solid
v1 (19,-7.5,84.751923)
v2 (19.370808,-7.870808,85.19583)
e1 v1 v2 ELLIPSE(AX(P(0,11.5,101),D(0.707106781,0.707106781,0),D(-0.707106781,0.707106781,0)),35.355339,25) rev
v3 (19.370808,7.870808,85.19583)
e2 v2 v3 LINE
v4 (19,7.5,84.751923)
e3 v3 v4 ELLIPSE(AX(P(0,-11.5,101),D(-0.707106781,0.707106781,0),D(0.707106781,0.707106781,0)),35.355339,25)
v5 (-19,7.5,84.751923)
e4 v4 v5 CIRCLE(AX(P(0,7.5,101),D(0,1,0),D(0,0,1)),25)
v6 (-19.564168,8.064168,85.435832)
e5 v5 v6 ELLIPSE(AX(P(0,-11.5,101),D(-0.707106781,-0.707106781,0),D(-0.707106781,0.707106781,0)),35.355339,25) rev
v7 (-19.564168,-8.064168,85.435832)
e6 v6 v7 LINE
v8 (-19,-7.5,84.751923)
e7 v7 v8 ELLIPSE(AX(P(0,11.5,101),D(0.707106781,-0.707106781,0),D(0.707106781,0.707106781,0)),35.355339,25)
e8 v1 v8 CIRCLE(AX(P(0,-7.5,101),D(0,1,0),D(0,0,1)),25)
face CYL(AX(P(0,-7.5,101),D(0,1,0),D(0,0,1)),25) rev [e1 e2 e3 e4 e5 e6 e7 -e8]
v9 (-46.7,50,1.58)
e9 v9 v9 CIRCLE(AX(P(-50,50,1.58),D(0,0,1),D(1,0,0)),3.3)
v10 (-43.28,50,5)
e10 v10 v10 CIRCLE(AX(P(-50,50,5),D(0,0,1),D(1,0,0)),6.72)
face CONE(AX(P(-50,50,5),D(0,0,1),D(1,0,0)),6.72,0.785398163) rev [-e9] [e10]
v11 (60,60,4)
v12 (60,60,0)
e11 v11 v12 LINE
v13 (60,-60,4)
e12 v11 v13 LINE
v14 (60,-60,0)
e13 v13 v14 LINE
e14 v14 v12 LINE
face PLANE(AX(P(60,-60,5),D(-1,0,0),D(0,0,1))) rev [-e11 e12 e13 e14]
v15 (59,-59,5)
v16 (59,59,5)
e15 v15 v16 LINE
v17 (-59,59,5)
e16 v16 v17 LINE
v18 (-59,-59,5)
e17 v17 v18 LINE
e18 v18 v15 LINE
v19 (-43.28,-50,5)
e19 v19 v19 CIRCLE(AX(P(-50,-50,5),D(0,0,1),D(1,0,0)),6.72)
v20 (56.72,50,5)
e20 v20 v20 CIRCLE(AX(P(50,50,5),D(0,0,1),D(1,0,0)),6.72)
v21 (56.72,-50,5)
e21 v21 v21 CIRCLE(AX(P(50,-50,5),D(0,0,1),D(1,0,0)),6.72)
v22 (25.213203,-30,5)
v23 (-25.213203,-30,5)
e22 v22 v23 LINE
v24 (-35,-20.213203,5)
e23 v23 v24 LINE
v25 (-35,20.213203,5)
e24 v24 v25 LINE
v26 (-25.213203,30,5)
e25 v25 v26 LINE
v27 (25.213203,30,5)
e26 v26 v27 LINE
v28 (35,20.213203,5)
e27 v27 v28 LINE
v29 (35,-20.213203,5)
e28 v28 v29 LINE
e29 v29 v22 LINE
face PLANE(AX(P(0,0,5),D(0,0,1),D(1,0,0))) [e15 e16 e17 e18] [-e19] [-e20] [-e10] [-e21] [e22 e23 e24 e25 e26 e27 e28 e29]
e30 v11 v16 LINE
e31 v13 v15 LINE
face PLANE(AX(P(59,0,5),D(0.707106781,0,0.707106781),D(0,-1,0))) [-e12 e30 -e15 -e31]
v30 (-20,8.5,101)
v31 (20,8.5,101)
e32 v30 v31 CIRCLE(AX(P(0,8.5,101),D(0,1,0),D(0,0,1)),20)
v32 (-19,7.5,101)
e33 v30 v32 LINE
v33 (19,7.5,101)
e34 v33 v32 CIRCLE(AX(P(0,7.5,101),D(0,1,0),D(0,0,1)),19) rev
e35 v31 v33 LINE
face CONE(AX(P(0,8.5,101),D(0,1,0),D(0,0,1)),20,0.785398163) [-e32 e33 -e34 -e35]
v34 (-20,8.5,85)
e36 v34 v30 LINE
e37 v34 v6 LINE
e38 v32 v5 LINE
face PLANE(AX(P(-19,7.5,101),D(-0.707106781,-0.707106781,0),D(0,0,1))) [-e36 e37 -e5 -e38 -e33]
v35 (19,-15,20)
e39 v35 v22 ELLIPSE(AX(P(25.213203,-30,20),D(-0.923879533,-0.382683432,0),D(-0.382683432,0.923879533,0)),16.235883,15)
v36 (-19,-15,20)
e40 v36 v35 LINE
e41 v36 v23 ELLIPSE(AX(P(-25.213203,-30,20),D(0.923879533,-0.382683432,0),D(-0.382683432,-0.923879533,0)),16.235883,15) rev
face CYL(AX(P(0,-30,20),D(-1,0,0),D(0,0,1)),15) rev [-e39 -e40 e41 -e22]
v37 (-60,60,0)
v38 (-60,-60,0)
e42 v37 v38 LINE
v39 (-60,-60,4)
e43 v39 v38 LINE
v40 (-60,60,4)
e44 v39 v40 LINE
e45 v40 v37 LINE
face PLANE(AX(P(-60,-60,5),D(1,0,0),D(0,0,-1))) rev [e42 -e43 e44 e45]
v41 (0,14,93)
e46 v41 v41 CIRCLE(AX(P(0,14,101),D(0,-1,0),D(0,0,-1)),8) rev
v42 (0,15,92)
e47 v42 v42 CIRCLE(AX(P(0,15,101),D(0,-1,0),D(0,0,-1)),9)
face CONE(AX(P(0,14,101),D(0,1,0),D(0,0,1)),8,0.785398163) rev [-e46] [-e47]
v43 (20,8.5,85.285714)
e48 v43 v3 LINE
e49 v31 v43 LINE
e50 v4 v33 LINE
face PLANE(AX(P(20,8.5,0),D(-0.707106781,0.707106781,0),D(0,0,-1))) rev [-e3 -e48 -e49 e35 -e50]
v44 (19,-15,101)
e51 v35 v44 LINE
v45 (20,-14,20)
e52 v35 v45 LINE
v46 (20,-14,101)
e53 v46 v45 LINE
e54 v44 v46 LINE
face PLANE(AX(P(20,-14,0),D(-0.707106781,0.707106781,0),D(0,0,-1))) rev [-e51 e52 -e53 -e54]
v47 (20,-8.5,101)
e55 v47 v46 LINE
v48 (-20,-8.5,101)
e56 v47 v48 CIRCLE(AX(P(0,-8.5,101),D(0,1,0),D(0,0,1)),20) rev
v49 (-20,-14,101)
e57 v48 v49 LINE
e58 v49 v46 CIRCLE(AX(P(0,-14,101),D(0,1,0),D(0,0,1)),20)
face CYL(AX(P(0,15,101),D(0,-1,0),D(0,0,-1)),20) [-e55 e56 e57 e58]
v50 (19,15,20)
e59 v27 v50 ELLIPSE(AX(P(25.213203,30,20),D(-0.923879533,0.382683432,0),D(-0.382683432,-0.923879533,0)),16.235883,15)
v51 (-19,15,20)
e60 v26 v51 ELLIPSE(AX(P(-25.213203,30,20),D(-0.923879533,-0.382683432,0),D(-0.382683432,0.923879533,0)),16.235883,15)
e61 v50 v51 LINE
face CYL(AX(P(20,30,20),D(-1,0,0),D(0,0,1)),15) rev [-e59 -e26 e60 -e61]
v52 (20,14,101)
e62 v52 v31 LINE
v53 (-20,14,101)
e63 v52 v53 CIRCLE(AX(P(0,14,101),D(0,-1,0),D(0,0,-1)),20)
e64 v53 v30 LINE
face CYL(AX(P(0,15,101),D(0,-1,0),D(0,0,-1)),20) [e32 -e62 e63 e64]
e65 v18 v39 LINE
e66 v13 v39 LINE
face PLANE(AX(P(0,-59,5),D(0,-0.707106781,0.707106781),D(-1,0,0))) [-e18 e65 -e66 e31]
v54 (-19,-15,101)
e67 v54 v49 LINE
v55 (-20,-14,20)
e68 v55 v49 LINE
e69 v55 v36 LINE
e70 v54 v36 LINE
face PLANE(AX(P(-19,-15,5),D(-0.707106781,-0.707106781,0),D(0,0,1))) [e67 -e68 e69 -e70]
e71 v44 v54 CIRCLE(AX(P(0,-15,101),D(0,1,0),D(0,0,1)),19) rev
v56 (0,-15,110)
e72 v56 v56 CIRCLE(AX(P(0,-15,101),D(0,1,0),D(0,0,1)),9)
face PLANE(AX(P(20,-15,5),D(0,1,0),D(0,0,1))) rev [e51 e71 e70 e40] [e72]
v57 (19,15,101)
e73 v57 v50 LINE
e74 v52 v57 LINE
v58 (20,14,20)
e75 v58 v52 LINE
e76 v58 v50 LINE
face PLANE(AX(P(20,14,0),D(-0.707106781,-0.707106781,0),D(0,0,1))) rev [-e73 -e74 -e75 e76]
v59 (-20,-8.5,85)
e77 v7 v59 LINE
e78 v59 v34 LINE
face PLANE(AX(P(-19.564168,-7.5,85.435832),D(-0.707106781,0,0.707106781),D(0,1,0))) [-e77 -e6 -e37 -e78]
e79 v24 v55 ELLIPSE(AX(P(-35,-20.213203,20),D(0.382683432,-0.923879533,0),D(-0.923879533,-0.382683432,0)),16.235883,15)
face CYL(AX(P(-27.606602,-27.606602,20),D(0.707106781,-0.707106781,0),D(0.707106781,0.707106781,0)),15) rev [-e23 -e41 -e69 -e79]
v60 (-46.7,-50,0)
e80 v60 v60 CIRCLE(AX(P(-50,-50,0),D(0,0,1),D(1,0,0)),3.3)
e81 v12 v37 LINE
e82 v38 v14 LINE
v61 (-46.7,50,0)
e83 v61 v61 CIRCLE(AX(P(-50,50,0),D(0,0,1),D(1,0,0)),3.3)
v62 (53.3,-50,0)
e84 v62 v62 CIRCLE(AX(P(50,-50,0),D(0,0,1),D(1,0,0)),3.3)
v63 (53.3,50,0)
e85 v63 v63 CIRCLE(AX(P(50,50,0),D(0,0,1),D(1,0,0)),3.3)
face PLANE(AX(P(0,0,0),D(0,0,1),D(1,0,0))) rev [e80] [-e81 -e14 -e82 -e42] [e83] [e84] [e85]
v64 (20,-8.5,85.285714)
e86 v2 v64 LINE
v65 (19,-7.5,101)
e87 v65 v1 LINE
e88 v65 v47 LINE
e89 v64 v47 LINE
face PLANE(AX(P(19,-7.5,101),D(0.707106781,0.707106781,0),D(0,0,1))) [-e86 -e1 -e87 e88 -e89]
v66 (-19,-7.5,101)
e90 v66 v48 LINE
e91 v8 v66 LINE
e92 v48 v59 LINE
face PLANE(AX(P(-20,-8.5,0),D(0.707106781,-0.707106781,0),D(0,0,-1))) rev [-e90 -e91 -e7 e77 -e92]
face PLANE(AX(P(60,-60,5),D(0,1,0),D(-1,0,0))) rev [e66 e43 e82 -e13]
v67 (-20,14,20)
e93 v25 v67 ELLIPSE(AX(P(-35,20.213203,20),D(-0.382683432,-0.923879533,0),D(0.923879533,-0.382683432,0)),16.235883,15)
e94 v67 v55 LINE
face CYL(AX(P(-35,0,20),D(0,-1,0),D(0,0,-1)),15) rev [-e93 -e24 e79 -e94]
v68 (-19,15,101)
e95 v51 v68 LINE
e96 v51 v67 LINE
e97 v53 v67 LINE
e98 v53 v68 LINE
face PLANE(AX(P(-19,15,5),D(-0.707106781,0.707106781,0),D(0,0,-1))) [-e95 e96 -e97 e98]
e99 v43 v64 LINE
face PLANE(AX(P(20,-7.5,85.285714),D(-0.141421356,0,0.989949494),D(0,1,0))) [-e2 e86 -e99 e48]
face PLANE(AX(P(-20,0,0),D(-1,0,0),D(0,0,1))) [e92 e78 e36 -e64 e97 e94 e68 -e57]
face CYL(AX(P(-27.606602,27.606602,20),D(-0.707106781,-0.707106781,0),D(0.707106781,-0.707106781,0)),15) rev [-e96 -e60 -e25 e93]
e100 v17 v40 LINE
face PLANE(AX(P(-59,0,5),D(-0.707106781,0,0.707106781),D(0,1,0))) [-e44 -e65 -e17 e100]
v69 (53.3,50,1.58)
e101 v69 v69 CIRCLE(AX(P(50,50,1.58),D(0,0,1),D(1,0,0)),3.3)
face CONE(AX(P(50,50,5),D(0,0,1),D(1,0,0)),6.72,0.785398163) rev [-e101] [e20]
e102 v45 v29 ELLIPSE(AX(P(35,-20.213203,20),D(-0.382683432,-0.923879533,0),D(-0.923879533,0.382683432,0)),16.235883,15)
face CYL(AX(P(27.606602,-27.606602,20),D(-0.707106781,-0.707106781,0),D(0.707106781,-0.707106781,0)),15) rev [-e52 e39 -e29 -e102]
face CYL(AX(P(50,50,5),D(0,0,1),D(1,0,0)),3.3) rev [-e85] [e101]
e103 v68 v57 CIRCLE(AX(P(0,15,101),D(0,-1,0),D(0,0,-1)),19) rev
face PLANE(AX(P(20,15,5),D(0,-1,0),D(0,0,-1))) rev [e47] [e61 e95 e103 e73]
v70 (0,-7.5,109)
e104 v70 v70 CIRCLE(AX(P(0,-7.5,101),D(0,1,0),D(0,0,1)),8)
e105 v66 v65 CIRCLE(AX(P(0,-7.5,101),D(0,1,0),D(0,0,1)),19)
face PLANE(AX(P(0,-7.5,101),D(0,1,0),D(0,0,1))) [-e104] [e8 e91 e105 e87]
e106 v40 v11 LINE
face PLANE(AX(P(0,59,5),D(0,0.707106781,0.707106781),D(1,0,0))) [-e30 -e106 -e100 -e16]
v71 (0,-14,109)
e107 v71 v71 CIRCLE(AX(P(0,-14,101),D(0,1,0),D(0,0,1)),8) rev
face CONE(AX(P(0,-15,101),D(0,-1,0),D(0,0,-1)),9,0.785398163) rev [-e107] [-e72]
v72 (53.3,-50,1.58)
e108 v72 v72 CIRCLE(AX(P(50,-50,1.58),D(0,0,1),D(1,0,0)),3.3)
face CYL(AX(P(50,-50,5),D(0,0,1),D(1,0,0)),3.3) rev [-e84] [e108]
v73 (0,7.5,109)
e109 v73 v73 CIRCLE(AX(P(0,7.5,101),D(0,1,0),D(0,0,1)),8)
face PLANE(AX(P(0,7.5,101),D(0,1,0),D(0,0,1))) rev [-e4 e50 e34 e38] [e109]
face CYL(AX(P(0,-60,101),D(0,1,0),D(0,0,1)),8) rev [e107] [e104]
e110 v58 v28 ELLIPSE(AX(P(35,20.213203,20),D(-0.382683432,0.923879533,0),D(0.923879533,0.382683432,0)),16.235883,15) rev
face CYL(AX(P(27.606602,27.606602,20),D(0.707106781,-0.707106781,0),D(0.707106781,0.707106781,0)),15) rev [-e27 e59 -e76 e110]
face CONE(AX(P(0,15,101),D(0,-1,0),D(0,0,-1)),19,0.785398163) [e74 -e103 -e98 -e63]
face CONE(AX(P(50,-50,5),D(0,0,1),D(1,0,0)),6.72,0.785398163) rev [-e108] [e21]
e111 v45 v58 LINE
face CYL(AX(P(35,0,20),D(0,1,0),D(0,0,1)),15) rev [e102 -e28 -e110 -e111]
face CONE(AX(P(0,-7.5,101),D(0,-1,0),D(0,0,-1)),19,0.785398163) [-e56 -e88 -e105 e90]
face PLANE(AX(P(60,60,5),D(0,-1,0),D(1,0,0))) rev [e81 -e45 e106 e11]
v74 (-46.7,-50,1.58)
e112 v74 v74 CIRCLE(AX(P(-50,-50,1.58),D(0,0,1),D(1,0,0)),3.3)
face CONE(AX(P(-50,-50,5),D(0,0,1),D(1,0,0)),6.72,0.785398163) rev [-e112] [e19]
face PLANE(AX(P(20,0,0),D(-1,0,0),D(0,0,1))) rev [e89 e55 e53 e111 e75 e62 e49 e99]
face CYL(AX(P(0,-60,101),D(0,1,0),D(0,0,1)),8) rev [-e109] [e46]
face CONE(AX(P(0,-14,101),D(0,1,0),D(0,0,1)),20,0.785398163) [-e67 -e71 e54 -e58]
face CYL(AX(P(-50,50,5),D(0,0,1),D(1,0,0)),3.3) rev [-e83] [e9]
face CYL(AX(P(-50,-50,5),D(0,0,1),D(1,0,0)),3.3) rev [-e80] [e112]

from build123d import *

# Parameters (mm, degrees)
SKETCH1_W                    = 120
SKETCH1_H                    = 120
BOSS_EXTRUDE1_DEPTH          = 5
CSK_FOR_M6_SFHCS1_AT_2_COUNT = 2
CSK_FOR_M6_SFHCS1_AT_2_PITCH = 100
CSK_FOR_M6_SFHCS1_AT_3_COUNT = 2
CSK_FOR_M6_SFHCS1_AT_3_PITCH = 141.421356237
CSK_FOR_M6_SFHCS1_AT_4_COUNT = 2
CSK_FOR_M6_SFHCS1_AT_4_PITCH = 100
SKETCH5_W                    = 96
SKETCH5_H                    = 30
BOSS_EXTRUDE2_DEPTH          = 20
SKETCH6_R                    = 20
BOSS_EXTRUDE3_DEPTH          = 15
SKETCH7_R                    = 25
CUT_EXTRUDE2_DEPTH           = 7.5
SKETCH8_R                    = 8
CUT_EXTRUDE3_DEPTH           = 155.486245342
CHAMFER1_SIZE                = 1
CHAMFER1_SIZE_2              = 0.714285714
FILLET1_R                    = 15
CHAMFER2_SIZE                = 1


with BuildPart() as part:
    # Sketch1 → Boss-Extrude1 (new body)
    with BuildSketch(Plane.XY):
        Rectangle(SKETCH1_W, SKETCH1_H)
    extrude(amount=BOSS_EXTRUDE1_DEPTH)

    # Sketch4 → CSK for M6 SFHCS1 (revolve, cut)
    with BuildSketch(Plane(origin=(-50, 50, 5), x_dir=(0, -1, 0), z_dir=(1, 0, 0))):
        Polygon((0, 0), (0, 5), (3.3, 5), (3.3, 3.42), (6.72, 0), align=None)
    csk_for_m6_sfhcs1 = revolve(axis=Axis((-50, 50, 11.35), (0, 0, -1)), mode=Mode.SUBTRACT)

    # CSK for M6 SFHCS1 at 2: CSK for M6 SFHCS1 ×2
    with Locations(*[(i * CSK_FOR_M6_SFHCS1_AT_2_PITCH, 0, 0) for i in range(1, CSK_FOR_M6_SFHCS1_AT_2_COUNT)]):
        add(csk_for_m6_sfhcs1, mode=Mode.SUBTRACT)

    # CSK for M6 SFHCS1 at 3: CSK for M6 SFHCS1 ×2
    with Locations(*[Vector(0.7071067811865476, -0.7071067811865476, 0) * (i * CSK_FOR_M6_SFHCS1_AT_3_PITCH) for i in range(1, CSK_FOR_M6_SFHCS1_AT_3_COUNT)]):
        add(csk_for_m6_sfhcs1, mode=Mode.SUBTRACT)

    # CSK for M6 SFHCS1 at 4: CSK for M6 SFHCS1 ×2
    with Locations(*[(0, -i * CSK_FOR_M6_SFHCS1_AT_4_PITCH, 0) for i in range(1, CSK_FOR_M6_SFHCS1_AT_4_COUNT)]):
        add(csk_for_m6_sfhcs1, mode=Mode.SUBTRACT)

    # Sketch5 → Boss-Extrude2 (add, symmetric)
    with BuildSketch(Plane(origin=(0, 0, 0), x_dir=(0, 0, -1), z_dir=(1, 0, 0))):
        with Locations((-53, 0)):
            Rectangle(SKETCH5_W, SKETCH5_H)
    extrude(amount=BOSS_EXTRUDE2_DEPTH, both=True)

    # Sketch6 → Boss-Extrude3 (add, symmetric)
    with BuildSketch(Plane(origin=(0, 0, 0), x_dir=(1, 0, 0), z_dir=(0, 1, 0))):
        with Locations((0, -101)):
            Circle(SKETCH6_R)
    extrude(amount=BOSS_EXTRUDE3_DEPTH, both=True)

    # Sketch7 → Cut-Extrude2 (cut, symmetric)
    with BuildSketch(Plane(origin=(0, 0, 0), x_dir=(1, 0, 0), z_dir=(0, 1, 0))):
        with Locations((0, -101)):
            Circle(SKETCH7_R)
    extrude(amount=CUT_EXTRUDE2_DEPTH, both=True, mode=Mode.SUBTRACT)

    # Sketch8 → Cut-Extrude3 (cut, through all)
    with BuildSketch(Plane(origin=(0, 15, 0), x_dir=(1, 0, 0), z_dir=(0, 1, 0))):
        with Locations(Location((0, -101, 0), (0, 0, 270))):
            Circle(SKETCH8_R)
    extrude(amount=-CUT_EXTRUDE3_DEPTH, mode=Mode.SUBTRACT)

    # Chamfer1
    # the kernel refuses this chamfer: 1, 0.714285714 mm, written as the material it takes off along each edge
    with BuildSketch(Plane(origin=(-20, 15, 5), x_dir=(0, -1, 0), z_dir=(0, 0, 1))) as chamfer1_piece_1:
        Polygon((CHAMFER1_SIZE, 0), (0, CHAMFER1_SIZE), (0, 0), align=None)
    extrude(amount=96, mode=Mode.SUBTRACT)
    with BuildSketch(Plane(origin=(-20, -15, 101), x_dir=(1, 0, 0), z_dir=(0, 0, -1)), Plane(origin=(20, 15, 5), x_dir=(0, -1, 0), z_dir=(0, 0, 1)), Plane(origin=(20, -15, 101), x_dir=(0, 1, 0), z_dir=(0, 0, -1))) as chamfer1_piece_2:
        Polygon((CHAMFER1_SIZE, 0), (0, -CHAMFER1_SIZE), (0, 0), align=None)
    extrude(amount=96, mode=Mode.SUBTRACT)
    with BuildSketch(Plane(origin=(0, -15, 101), x_dir=(-1, 0, 0), z_dir=(0, 0, -1))) as chamfer1_piece_3:
        Polygon((20 - CHAMFER1_SIZE, 0), (20, CHAMFER1_SIZE), (20, 0), align=None)
    revolve(axis=Axis((0, -15, 101), (0, 1, 0)), revolution_arc=180, mode=Mode.SUBTRACT)
    with BuildSketch(Plane(origin=(0, 15, 101), x_dir=(-1, 0, 0), z_dir=(0, 0, -1))) as chamfer1_piece_4:
        Polygon((20 - CHAMFER1_SIZE, 0), (20, -CHAMFER1_SIZE), (20, 0), align=None)
    revolve(axis=Axis((0, 15, 101), (0, 1, 0)), revolution_arc=180, mode=Mode.SUBTRACT)
    with BuildSketch(Plane(origin=(0, 7.5, 101), x_dir=(-1, 0, 0), z_dir=(0, 0, -1))) as chamfer1_piece_5:
        Polygon((20 - CHAMFER1_SIZE, 0), (20, CHAMFER1_SIZE), (20, 0), align=None)
    revolve(axis=Axis((0, 7.5, 101), (0, 1, 0)), revolution_arc=180, mode=Mode.SUBTRACT)
    with BuildSketch(Plane(origin=(0, -7.5, 101), x_dir=(-1, 0, 0), z_dir=(0, 0, -1))) as chamfer1_piece_6:
        Polygon((20, -CHAMFER1_SIZE), (20 - CHAMFER1_SIZE, 0), (20, 0), align=None)
    revolve(axis=Axis((0, -7.5, 101), (0, 1, 0)), revolution_arc=180, mode=Mode.SUBTRACT)
    with BuildSketch(Plane(origin=(-20, -7.5, 83.428317012), x_dir=(0, -1, 0), z_dir=(0, 0, 1))) as chamfer1_piece_7_section:
        Polygon((CHAMFER1_SIZE, 0), (0, CHAMFER1_SIZE), (0, 0), align=None)
    chamfer1_piece_7 = extrude(amount=17.571682988, mode=Mode.PRIVATE)
    chamfer1_piece_7 = chamfer1_piece_7 & Plane(origin=(0, -7.5, 101), x_dir=(1, 0, 0), z_dir=(0, 1, 0)) * Cylinder(25, 40, mode=Mode.PRIVATE)
    add(chamfer1_piece_7, mode=Mode.SUBTRACT)
    with BuildSketch(Plane(origin=(20, 7.5, 83.428317012), x_dir=(0, 1, 0), z_dir=(0, 0, 1))) as chamfer1_piece_8_section:
        Polygon((CHAMFER1_SIZE, 0), (0, CHAMFER1_SIZE), (0, 0), align=None)
    chamfer1_piece_8 = extrude(amount=17.571682988, mode=Mode.PRIVATE)
    chamfer1_piece_8 = chamfer1_piece_8 & Plane(origin=(0, 7.5, 101), x_dir=(1, 0, 0), z_dir=(0, 1, 0)) * Cylinder(25, 40, mode=Mode.PRIVATE)
    add(chamfer1_piece_8, mode=Mode.SUBTRACT)
    with BuildSketch(Plane(origin=(20, -7.5, 83.428317012), x_dir=(0, -1, 0), z_dir=(0, 0, 1))) as chamfer1_piece_9_section:
        Polygon((CHAMFER1_SIZE, 0), (0, -CHAMFER1_SIZE), (0, 0), align=None)
    chamfer1_piece_9 = extrude(amount=17.571682988, mode=Mode.PRIVATE)
    chamfer1_piece_9 = chamfer1_piece_9 & Plane(origin=(0, -7.5, 101), x_dir=(1, 0, 0), z_dir=(0, 1, 0)) * Cylinder(25, 40, mode=Mode.PRIVATE)
    add(chamfer1_piece_9, mode=Mode.SUBTRACT)
    with BuildSketch(Plane(origin=(-20, 7.5, 83.428317012), x_dir=(0, 1, 0), z_dir=(0, 0, 1))) as chamfer1_piece_10_section:
        Polygon((CHAMFER1_SIZE, 0), (0, -CHAMFER1_SIZE), (0, 0), align=None)
    chamfer1_piece_10 = extrude(amount=17.571682988, mode=Mode.PRIVATE)
    chamfer1_piece_10 = chamfer1_piece_10 & Plane(origin=(0, 7.5, 101), x_dir=(1, 0, 0), z_dir=(0, 1, 0)) * Cylinder(25, 40, mode=Mode.PRIVATE)
    add(chamfer1_piece_10, mode=Mode.SUBTRACT)
    with BuildSketch(Plane(origin=(0, -15, 101), x_dir=(0, 0, 1), z_dir=(-1, 0, 0))) as chamfer1_piece_11:
        Polygon((8 + CHAMFER1_SIZE, 0), (8, CHAMFER1_SIZE), (8, 0), align=None)
    revolve(axis=Axis((0, -15, 101), (0, 1, 0)), mode=Mode.SUBTRACT)
    with BuildSketch(Plane(origin=(0, 15, 101), x_dir=(0, 0, 1), z_dir=(-1, 0, 0))) as chamfer1_piece_12:
        Polygon((8 + CHAMFER1_SIZE, 0), (8, -CHAMFER1_SIZE), (8, 0), align=None)
    revolve(axis=Axis((0, 15, 101), (0, 1, 0)), mode=Mode.SUBTRACT)
    with BuildSketch(Plane(origin=(-20, -7.5, 86), x_dir=(0, 0, -1), z_dir=(0, 1, 0))) as chamfer1_piece_13:
        with BuildLine():
            Line((CHAMFER1_SIZE, 0), (0.56416807, -0.43583193))
            ThreePointArc((0.56416807, -0.43583193), (0.281621078, -0.214347187), (0, 0))
            Line((0, 0), (CHAMFER1_SIZE, 0))
        make_face()
    extrude(amount=15, mode=Mode.SUBTRACT)
    with BuildSketch(Plane(origin=(20, -7.5, 86), x_dir=(0, 0, -1), z_dir=(0, 1, 0))) as chamfer1_piece_14:
        with BuildLine():
            Line((CHAMFER1_SIZE_2, 0), (0.80417029, 0.629192029))
            ThreePointArc((0.80417029, 0.629192029), (0.416667008, 0.319390803), (0, 0))
            Line((0, 0), (CHAMFER1_SIZE_2, 0))
        make_face()
    extrude(amount=15, mode=Mode.SUBTRACT)
    with BuildSketch(Plane(origin=(-20, -7.5, 83.428317012), x_dir=(0, -1, 0), z_dir=(0, 0, 1))) as chamfer1_piece_15a_section:
        Polygon((CHAMFER1_SIZE, 0), (0, CHAMFER1_SIZE), (0, 0), align=None)
    chamfer1_piece_15a = extrude(amount=17.571682988, mode=Mode.PRIVATE)
    chamfer1_piece_15a = chamfer1_piece_15a - Plane(origin=(0, -7.5, 101), x_dir=(1, 0, 0), z_dir=(0, 1, 0)) * Cylinder(25, 40, mode=Mode.PRIVATE)
    with BuildSketch(Plane(origin=(-20, -10.071682988, 86), x_dir=(0, 0, -1), z_dir=(0, 1, 0))) as chamfer1_piece_15b_section:
        with BuildLine():
            Line((CHAMFER1_SIZE, 0), (0.56416807, -0.43583193))
            ThreePointArc((0.56416807, -0.43583193), (0.281621078, -0.214347187), (0, 0))
            Line((0, 0), (CHAMFER1_SIZE, 0))
        make_face()
    chamfer1_piece_15b = extrude(amount=17.571682988, mode=Mode.PRIVATE)
    chamfer1_piece_15b = split(chamfer1_piece_15b, bisect_by=Plane(origin=(-20, -7.5, 86), z_dir=(0, -1, 0)), keep=Keep.TOP, mode=Mode.PRIVATE)
    chamfer1_piece_15 = chamfer1_piece_15a & chamfer1_piece_15b
    add(chamfer1_piece_15, mode=Mode.SUBTRACT)
    with BuildSketch(Plane(origin=(20, -7.5, 86), x_dir=(0, 0, -1), z_dir=(0, 1, 0))) as chamfer1_piece_16a_section:
        with BuildLine():
            Line((CHAMFER1_SIZE_2, 0), (0.80417029, 0.629192029))
            ThreePointArc((0.80417029, 0.629192029), (0.416667008, 0.319390803), (0, 0))
            Line((0, 0), (CHAMFER1_SIZE_2, 0))
        make_face()
    chamfer1_piece_16a = extrude(amount=17.625714283, mode=Mode.PRIVATE)
    chamfer1_piece_16a = split(chamfer1_piece_16a, bisect_by=Plane(origin=(20, 7.5, 86), z_dir=(0, 1, 0)), keep=Keep.TOP, mode=Mode.PRIVATE)
    with BuildSketch(Plane(origin=(20, 7.5, 83.428317012), x_dir=(0, 1, 0), z_dir=(0, 0, 1))) as chamfer1_piece_16b_section:
        Polygon((CHAMFER1_SIZE, 0), (0, CHAMFER1_SIZE), (0, 0), align=None)
    chamfer1_piece_16b = extrude(amount=17.571682988, mode=Mode.PRIVATE)
    chamfer1_piece_16b = chamfer1_piece_16b - Plane(origin=(0, 7.5, 101), x_dir=(1, 0, 0), z_dir=(0, 1, 0)) * Cylinder(25, 40, mode=Mode.PRIVATE)
    chamfer1_piece_16 = chamfer1_piece_16a & chamfer1_piece_16b
    add(chamfer1_piece_16, mode=Mode.SUBTRACT)
    with BuildSketch(Plane(origin=(20, -7.5, 83.428317012), x_dir=(0, -1, 0), z_dir=(0, 0, 1))) as chamfer1_piece_17a_section:
        Polygon((CHAMFER1_SIZE, 0), (0, -CHAMFER1_SIZE), (0, 0), align=None)
    chamfer1_piece_17a = extrude(amount=17.571682988, mode=Mode.PRIVATE)
    chamfer1_piece_17a = chamfer1_piece_17a - Plane(origin=(0, -7.5, 101), x_dir=(1, 0, 0), z_dir=(0, 1, 0)) * Cylinder(25, 40, mode=Mode.PRIVATE)
    with BuildSketch(Plane(origin=(20, -10.125714283, 86), x_dir=(0, 0, -1), z_dir=(0, 1, 0))) as chamfer1_piece_17b_section:
        with BuildLine():
            Line((CHAMFER1_SIZE_2, 0), (0.80417029, 0.629192029))
            ThreePointArc((0.80417029, 0.629192029), (0.416667008, 0.319390803), (0, 0))
            Line((0, 0), (CHAMFER1_SIZE_2, 0))
        make_face()
    chamfer1_piece_17b = extrude(amount=17.625714283, mode=Mode.PRIVATE)
    chamfer1_piece_17b = split(chamfer1_piece_17b, bisect_by=Plane(origin=(20, -7.5, 86), z_dir=(0, -1, 0)), keep=Keep.TOP, mode=Mode.PRIVATE)
    chamfer1_piece_17 = chamfer1_piece_17a & chamfer1_piece_17b
    add(chamfer1_piece_17, mode=Mode.SUBTRACT)
    with BuildSketch(Plane(origin=(-20, -7.5, 86), x_dir=(0, 0, -1), z_dir=(0, 1, 0))) as chamfer1_piece_18a_section:
        with BuildLine():
            Line((CHAMFER1_SIZE, 0), (0.56416807, -0.43583193))
            ThreePointArc((0.56416807, -0.43583193), (0.281621078, -0.214347187), (0, 0))
            Line((0, 0), (CHAMFER1_SIZE, 0))
        make_face()
    chamfer1_piece_18a = extrude(amount=17.571682988, mode=Mode.PRIVATE)
    chamfer1_piece_18a = split(chamfer1_piece_18a, bisect_by=Plane(origin=(-20, 7.5, 86), z_dir=(0, 1, 0)), keep=Keep.TOP, mode=Mode.PRIVATE)
    with BuildSketch(Plane(origin=(-20, 7.5, 83.428317012), x_dir=(0, 1, 0), z_dir=(0, 0, 1))) as chamfer1_piece_18b_section:
        Polygon((CHAMFER1_SIZE, 0), (0, -CHAMFER1_SIZE), (0, 0), align=None)
    chamfer1_piece_18b = extrude(amount=17.571682988, mode=Mode.PRIVATE)
    chamfer1_piece_18b = chamfer1_piece_18b - Plane(origin=(0, 7.5, 101), x_dir=(1, 0, 0), z_dir=(0, 1, 0)) * Cylinder(25, 40, mode=Mode.PRIVATE)
    chamfer1_piece_18 = chamfer1_piece_18a & chamfer1_piece_18b
    add(chamfer1_piece_18, mode=Mode.SUBTRACT)

    # Fillet1
    fillet1_edges = [part.edges().sort_by_distance(p)[0] for p in [
        (-19.5, -14.5, 5),
        (19.5, -14.5, 5),
        (-19.5, 14.5, 5),
        (19.5, 14.5, 5),
        (20, 0, 5),
        (-20, 0, 5),
        (0, 15, 5),
        (0, -15, 5),
    ]]
    fillet(fillet1_edges, radius=FILLET1_R)

    # Chamfer2
    chamfer2_edges = [part.edges().sort_by_distance(p)[0] for p in [
        (60, 0, 5),
        (0, 60, 5),
        (-60, 0, 5),
        (0, -60, 5),
    ]]
    chamfer(chamfer2_edges, length=CHAMFER2_SIZE)


solid = part.part
